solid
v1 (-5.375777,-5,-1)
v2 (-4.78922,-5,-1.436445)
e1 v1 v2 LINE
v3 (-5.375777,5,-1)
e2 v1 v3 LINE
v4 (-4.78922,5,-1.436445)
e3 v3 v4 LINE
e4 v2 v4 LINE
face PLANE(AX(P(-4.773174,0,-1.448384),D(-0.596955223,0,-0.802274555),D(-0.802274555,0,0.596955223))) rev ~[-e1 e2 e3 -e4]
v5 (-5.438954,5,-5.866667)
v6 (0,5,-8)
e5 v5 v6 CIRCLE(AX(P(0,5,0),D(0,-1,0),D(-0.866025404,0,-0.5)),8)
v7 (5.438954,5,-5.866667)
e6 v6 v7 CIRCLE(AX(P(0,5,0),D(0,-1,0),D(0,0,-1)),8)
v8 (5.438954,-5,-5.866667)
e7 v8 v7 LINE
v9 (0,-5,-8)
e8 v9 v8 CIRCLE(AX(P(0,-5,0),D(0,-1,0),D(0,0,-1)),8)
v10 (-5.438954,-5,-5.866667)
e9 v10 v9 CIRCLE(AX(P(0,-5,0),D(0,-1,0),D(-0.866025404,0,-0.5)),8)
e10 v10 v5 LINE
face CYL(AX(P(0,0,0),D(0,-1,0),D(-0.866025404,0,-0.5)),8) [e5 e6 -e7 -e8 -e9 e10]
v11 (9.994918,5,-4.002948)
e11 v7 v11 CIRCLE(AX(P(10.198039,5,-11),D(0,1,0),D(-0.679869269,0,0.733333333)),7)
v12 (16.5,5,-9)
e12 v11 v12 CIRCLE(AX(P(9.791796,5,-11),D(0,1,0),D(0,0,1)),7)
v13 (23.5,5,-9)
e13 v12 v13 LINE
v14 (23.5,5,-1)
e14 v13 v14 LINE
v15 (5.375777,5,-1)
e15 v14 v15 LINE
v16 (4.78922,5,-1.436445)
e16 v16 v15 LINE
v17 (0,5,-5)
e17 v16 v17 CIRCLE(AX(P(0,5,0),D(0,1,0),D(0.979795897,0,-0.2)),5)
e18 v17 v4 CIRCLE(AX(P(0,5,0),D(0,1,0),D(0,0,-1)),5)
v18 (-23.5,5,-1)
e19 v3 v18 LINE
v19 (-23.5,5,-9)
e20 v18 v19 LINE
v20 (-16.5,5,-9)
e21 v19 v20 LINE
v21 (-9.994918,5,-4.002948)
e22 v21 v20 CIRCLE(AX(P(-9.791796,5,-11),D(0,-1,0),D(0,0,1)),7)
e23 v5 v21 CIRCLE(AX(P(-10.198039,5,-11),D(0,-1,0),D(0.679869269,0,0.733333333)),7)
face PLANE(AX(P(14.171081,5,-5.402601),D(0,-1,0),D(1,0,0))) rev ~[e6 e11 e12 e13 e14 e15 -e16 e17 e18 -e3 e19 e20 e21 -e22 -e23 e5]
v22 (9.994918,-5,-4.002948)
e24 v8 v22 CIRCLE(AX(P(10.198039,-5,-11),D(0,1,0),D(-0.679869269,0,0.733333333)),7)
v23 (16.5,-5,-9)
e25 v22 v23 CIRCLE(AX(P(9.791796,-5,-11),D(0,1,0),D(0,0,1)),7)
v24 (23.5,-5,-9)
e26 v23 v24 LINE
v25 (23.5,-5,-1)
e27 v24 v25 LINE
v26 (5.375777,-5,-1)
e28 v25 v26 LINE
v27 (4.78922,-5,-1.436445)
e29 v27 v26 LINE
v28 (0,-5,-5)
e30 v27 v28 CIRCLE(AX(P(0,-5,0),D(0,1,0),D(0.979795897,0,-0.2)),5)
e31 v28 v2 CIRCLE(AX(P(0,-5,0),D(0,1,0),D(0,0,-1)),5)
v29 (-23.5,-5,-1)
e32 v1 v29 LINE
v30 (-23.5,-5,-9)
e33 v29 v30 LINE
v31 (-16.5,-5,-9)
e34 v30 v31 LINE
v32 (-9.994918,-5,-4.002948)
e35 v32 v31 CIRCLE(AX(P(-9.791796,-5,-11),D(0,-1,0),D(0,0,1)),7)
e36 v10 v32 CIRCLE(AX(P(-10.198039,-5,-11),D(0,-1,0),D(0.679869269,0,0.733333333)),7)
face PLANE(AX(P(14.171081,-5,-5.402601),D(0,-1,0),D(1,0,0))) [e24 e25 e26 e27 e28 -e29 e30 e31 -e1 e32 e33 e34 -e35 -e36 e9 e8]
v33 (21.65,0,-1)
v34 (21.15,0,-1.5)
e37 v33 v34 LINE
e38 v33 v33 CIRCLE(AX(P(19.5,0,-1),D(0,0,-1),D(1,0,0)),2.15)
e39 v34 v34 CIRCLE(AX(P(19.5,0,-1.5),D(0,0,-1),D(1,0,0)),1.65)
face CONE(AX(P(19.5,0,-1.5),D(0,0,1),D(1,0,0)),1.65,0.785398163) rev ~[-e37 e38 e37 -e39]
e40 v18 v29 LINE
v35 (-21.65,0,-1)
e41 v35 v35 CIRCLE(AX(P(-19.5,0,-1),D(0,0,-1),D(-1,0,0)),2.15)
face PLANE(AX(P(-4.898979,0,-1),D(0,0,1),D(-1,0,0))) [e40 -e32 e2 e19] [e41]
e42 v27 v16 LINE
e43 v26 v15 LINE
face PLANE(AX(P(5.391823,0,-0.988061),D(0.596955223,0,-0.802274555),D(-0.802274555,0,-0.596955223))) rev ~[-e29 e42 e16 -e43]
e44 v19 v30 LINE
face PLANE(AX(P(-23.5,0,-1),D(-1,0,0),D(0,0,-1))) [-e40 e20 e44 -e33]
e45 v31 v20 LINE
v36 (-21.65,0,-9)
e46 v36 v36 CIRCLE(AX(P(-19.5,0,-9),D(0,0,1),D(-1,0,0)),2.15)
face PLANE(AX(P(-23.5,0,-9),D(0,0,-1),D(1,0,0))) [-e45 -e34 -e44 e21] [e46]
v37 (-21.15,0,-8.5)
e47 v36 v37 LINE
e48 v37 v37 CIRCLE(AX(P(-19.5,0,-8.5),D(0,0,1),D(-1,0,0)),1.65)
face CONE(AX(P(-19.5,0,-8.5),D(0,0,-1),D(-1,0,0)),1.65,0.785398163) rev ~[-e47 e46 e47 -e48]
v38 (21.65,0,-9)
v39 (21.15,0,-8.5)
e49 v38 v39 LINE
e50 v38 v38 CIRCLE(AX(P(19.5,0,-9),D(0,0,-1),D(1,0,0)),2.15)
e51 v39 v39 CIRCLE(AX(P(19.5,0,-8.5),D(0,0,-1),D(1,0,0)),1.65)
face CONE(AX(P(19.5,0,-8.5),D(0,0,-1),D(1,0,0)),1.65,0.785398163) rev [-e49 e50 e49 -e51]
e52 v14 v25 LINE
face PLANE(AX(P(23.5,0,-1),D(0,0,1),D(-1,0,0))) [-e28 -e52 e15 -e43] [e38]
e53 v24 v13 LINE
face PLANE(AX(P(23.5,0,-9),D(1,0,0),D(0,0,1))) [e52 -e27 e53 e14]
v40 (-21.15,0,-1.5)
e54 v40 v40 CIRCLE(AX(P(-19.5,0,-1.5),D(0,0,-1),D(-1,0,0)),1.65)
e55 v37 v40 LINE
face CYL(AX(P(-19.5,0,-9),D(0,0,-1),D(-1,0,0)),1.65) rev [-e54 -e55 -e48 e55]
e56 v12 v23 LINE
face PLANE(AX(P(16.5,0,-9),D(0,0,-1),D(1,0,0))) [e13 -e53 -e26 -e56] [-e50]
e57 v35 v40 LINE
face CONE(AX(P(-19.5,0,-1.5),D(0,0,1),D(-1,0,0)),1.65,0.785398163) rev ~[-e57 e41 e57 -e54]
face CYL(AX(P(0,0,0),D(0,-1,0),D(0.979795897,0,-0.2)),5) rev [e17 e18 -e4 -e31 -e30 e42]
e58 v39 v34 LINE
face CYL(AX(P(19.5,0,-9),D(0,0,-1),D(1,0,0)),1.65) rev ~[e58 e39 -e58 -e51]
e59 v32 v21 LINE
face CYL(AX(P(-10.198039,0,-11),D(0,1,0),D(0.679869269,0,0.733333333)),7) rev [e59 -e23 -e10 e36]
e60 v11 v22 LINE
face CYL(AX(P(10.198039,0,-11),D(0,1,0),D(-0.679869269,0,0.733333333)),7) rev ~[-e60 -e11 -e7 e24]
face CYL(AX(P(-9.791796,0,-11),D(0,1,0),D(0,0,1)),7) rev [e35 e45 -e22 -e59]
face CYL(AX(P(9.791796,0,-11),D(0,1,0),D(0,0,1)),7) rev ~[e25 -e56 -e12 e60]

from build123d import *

# Parameters (mm, degrees)
F1_DEPTH    = 5
F3_T1_DEPTH = 5
F3_T3_DEPTH = 5
F4_T1_DEPTH = 6.2324692544
F4_T3_DEPTH = 6.2324692544
F2_R        = 1.65
F5_DEPTH    = 8.001
F6_SIZE     = 0.5


# Not quite as in the source:
# - a fillet or chamfer that OpenCascade refuses, or shapes differently, is made with other operations: its cross-section is extruded or revolved along the edge and cut away or added
# - a pattern or mirror of a feature is missing from the dataset's text; its kind, count and spacing are read off the source's solid


with BuildPart() as f1:
    # F0 (on Front) → F1 (new body, symmetric)
    with BuildSketch(Plane.XZ):
        with BuildLine():
            Line((23.5, -9), (23.5, -1))
            Line((23.5, -1), (4.8989794856, -1))
            ThreePointArc((4.8989794856, -1), (3.1622776602, -3.8729833462), (0, -5))
            ThreePointArc((0, -5), (-3.1622776602, -3.8729833462), (-4.8989794856, -1))
            Line((-4.8989794856, -1), (-23.5, -1))
            Line((-23.5, -1), (-23.5, -9))
            Line((-23.5, -9), (-16.5, -9))
            Line((-16.5, -9), (-16.5, -4))
            Line((-16.5, -4), (-6.9282032303, -4))
            ThreePointArc((-6.9282032303, -4), (-4, -6.9282032303), (0, -8))
            ThreePointArc((0, -8), (4, -6.9282032303), (6.9282032303, -4))
            Line((6.9282032303, -4), (16.5, -4))
            Line((16.5, -4), (16.5, -9))
            Line((16.5, -9), (23.5, -9))
        make_face()
    extrude(amount=F1_DEPTH, both=True)

    # F3: fillet of radius 7 on 8 edges, made by hand

    # F3_s2 → F3_t1 (join)
    with BuildSketch(Plane.XZ.offset(-5)):
        with BuildLine():
            ThreePointArc((9.7917960675, -4), (13.9750962002, -5.3875139198), (16.5, -9))
            Line((16.5, -9), (16.5, -4))
            Line((16.5, -4), (9.7917960675, -4))
        make_face()
        with BuildLine():
            ThreePointArc((5.4389541478, -5.8666666667), (7.6420004255, -4.4833546462), (10.1980390272, -4))
            Line((10.1980390272, -4), (6.9282032303, -4))
            ThreePointArc((6.9282032303, -4), (6.2536194731, -4.989212712), (5.4389541478, -5.8666666667))
        make_face()
        with BuildLine():
            ThreePointArc((-9.7917960675, -4), (-13.9750962002, -5.3875139198), (-16.5, -9))
            Line((-16.5, -9), (-16.5, -4))
            Line((-16.5, -4), (-9.7917960675, -4))
        make_face()
        with BuildLine():
            ThreePointArc((-5.4389541478, -5.8666666667), (-7.6420004255, -4.4833546462), (-10.1980390272, -4))
            Line((-10.1980390272, -4), (-6.9282032303, -4))
            ThreePointArc((-6.9282032303, -4), (-6.2536194731, -4.989212712), (-5.4389541478, -5.8666666667))
        make_face()
    extrude(amount=F3_T1_DEPTH)

    # F3_s4 → F3_t3 (join)
    with BuildSketch(Plane.XZ):
        with BuildLine():
            ThreePointArc((9.7917960675, -4), (13.9750962002, -5.3875139198), (16.5, -9))
            Line((16.5, -9), (16.5, -4))
            Line((16.5, -4), (9.7917960675, -4))
        make_face()
        with BuildLine():
            ThreePointArc((5.4389541478, -5.8666666667), (7.6420004255, -4.4833546462), (10.1980390272, -4))
            Line((10.1980390272, -4), (6.9282032303, -4))
            ThreePointArc((6.9282032303, -4), (6.2536194731, -4.989212712), (5.4389541478, -5.8666666667))
        make_face()
        with BuildLine():
            ThreePointArc((-9.7917960675, -4), (-13.9750962002, -5.3875139198), (-16.5, -9))
            Line((-16.5, -9), (-16.5, -4))
            Line((-16.5, -4), (-9.7917960675, -4))
        make_face()
        with BuildLine():
            ThreePointArc((-5.4389541478, -5.8666666667), (-7.6420004255, -4.4833546462), (-10.1980390272, -4))
            Line((-10.1980390272, -4), (-6.9282032303, -4))
            ThreePointArc((-6.9282032303, -4), (-6.2536194731, -4.989212712), (-5.4389541478, -5.8666666667))
        make_face()
    extrude(amount=F3_T3_DEPTH)

    # F4: chamfer of 0.5 on 4 edges, made by hand

    # F4_s2 → F4_t1 (cut)
    with BuildSketch(Plane.XZ.offset(-6.2324692544)):
        with BuildLine():
            Line((-4.7731743681, -1.4483837223), (-5.3918225964, -0.9880608955))
            Line((-5.3918225964, -0.9880608955), (-5.3918225964, -0.9780608955))
            ThreePointArc((-5.3918225964, -0.9780608955), (-5.145401041, -0.99), (-4.8989794856, -0.99))
            Line((-4.8989794856, -0.99), (-4.8891815266, -0.998))
            ThreePointArc((-4.8891815266, -0.998), (-4.8374189809, -1.2245315852), (-4.7635959284, -1.445510833))
            Line((-4.7635959284, -1.445510833), (-4.7731743681, -1.4483837223))
        make_face()
        with BuildLine():
            Line((5.3918225964, -0.9880608955), (4.7731743681, -1.4483837223))
            Line((4.7731743681, -1.4483837223), (4.7635959284, -1.445510833))
            ThreePointArc((4.7635959284, -1.445510833), (4.8374189809, -1.2245315852), (4.8891815266, -0.998))
            Line((4.8891815266, -0.998), (4.8989794856, -0.99))
            ThreePointArc((4.8989794856, -0.99), (5.145401041, -0.99), (5.3918225964, -0.9780608955))
            Line((5.3918225964, -0.9780608955), (5.3918225964, -0.9880608955))
        make_face()
    extrude(amount=F4_T1_DEPTH, mode=Mode.SUBTRACT)

    # F4_s4 → F4_t3 (cut)
    with BuildSketch(Plane.XZ):
        with BuildLine():
            Line((-4.7731743681, -1.4483837223), (-5.3918225964, -0.9880608955))
            Line((-5.3918225964, -0.9880608955), (-5.3918225964, -0.9780608955))
            ThreePointArc((-5.3918225964, -0.9780608955), (-5.145401041, -0.99), (-4.8989794856, -0.99))
            Line((-4.8989794856, -0.99), (-4.8891815266, -0.998))
            ThreePointArc((-4.8891815266, -0.998), (-4.8374189809, -1.2245315852), (-4.7635959284, -1.445510833))
            Line((-4.7635959284, -1.445510833), (-4.7731743681, -1.4483837223))
        make_face()
        with BuildLine():
            Line((5.3918225964, -0.9880608955), (4.7731743681, -1.4483837223))
            Line((4.7731743681, -1.4483837223), (4.7635959284, -1.445510833))
            ThreePointArc((4.7635959284, -1.445510833), (4.8374189809, -1.2245315852), (4.8891815266, -0.998))
            Line((4.8891815266, -0.998), (4.8989794856, -0.99))
            ThreePointArc((4.8989794856, -0.99), (5.145401041, -0.99), (5.3918225964, -0.9780608955))
            Line((5.3918225964, -0.9780608955), (5.3918225964, -0.9880608955))
        make_face()
    extrude(amount=F4_T3_DEPTH, mode=Mode.SUBTRACT)

    # F2 (on face) → F5 (cut, through all)
    with BuildSketch(Plane(origin=(0, 0, -9), x_dir=(1, 0, 0), z_dir=(0, 0, -1))):
        with Locations((19.5, 0)):
            Circle(F2_R)
    f5 = extrude(amount=-F5_DEPTH, mode=Mode.SUBTRACT)

    # F5_copies: F5 across plane
    add(f5.mirror(Plane(origin=(0, 0, 0), x_dir=(0, 0, -1), z_dir=(-1, 0, 0))), mode=Mode.SUBTRACT)

    # F6
    f6_edges = [f1.edges().sort_by_distance(p)[0] for p in [
        (19.5, 1.65, -9),
        (19.5, -1.65, -9),
        (19.5, 1.65, -1),
        (-19.5, 1.65, -9),
        (-19.5, 1.65, -1),
        (-19.5, -1.65, -9),
        (-19.5, -1.65, -1),
        (19.5, -1.65, -1),
    ]]
    chamfer(f6_edges, length=F6_SIZE)


solid = f1.part
